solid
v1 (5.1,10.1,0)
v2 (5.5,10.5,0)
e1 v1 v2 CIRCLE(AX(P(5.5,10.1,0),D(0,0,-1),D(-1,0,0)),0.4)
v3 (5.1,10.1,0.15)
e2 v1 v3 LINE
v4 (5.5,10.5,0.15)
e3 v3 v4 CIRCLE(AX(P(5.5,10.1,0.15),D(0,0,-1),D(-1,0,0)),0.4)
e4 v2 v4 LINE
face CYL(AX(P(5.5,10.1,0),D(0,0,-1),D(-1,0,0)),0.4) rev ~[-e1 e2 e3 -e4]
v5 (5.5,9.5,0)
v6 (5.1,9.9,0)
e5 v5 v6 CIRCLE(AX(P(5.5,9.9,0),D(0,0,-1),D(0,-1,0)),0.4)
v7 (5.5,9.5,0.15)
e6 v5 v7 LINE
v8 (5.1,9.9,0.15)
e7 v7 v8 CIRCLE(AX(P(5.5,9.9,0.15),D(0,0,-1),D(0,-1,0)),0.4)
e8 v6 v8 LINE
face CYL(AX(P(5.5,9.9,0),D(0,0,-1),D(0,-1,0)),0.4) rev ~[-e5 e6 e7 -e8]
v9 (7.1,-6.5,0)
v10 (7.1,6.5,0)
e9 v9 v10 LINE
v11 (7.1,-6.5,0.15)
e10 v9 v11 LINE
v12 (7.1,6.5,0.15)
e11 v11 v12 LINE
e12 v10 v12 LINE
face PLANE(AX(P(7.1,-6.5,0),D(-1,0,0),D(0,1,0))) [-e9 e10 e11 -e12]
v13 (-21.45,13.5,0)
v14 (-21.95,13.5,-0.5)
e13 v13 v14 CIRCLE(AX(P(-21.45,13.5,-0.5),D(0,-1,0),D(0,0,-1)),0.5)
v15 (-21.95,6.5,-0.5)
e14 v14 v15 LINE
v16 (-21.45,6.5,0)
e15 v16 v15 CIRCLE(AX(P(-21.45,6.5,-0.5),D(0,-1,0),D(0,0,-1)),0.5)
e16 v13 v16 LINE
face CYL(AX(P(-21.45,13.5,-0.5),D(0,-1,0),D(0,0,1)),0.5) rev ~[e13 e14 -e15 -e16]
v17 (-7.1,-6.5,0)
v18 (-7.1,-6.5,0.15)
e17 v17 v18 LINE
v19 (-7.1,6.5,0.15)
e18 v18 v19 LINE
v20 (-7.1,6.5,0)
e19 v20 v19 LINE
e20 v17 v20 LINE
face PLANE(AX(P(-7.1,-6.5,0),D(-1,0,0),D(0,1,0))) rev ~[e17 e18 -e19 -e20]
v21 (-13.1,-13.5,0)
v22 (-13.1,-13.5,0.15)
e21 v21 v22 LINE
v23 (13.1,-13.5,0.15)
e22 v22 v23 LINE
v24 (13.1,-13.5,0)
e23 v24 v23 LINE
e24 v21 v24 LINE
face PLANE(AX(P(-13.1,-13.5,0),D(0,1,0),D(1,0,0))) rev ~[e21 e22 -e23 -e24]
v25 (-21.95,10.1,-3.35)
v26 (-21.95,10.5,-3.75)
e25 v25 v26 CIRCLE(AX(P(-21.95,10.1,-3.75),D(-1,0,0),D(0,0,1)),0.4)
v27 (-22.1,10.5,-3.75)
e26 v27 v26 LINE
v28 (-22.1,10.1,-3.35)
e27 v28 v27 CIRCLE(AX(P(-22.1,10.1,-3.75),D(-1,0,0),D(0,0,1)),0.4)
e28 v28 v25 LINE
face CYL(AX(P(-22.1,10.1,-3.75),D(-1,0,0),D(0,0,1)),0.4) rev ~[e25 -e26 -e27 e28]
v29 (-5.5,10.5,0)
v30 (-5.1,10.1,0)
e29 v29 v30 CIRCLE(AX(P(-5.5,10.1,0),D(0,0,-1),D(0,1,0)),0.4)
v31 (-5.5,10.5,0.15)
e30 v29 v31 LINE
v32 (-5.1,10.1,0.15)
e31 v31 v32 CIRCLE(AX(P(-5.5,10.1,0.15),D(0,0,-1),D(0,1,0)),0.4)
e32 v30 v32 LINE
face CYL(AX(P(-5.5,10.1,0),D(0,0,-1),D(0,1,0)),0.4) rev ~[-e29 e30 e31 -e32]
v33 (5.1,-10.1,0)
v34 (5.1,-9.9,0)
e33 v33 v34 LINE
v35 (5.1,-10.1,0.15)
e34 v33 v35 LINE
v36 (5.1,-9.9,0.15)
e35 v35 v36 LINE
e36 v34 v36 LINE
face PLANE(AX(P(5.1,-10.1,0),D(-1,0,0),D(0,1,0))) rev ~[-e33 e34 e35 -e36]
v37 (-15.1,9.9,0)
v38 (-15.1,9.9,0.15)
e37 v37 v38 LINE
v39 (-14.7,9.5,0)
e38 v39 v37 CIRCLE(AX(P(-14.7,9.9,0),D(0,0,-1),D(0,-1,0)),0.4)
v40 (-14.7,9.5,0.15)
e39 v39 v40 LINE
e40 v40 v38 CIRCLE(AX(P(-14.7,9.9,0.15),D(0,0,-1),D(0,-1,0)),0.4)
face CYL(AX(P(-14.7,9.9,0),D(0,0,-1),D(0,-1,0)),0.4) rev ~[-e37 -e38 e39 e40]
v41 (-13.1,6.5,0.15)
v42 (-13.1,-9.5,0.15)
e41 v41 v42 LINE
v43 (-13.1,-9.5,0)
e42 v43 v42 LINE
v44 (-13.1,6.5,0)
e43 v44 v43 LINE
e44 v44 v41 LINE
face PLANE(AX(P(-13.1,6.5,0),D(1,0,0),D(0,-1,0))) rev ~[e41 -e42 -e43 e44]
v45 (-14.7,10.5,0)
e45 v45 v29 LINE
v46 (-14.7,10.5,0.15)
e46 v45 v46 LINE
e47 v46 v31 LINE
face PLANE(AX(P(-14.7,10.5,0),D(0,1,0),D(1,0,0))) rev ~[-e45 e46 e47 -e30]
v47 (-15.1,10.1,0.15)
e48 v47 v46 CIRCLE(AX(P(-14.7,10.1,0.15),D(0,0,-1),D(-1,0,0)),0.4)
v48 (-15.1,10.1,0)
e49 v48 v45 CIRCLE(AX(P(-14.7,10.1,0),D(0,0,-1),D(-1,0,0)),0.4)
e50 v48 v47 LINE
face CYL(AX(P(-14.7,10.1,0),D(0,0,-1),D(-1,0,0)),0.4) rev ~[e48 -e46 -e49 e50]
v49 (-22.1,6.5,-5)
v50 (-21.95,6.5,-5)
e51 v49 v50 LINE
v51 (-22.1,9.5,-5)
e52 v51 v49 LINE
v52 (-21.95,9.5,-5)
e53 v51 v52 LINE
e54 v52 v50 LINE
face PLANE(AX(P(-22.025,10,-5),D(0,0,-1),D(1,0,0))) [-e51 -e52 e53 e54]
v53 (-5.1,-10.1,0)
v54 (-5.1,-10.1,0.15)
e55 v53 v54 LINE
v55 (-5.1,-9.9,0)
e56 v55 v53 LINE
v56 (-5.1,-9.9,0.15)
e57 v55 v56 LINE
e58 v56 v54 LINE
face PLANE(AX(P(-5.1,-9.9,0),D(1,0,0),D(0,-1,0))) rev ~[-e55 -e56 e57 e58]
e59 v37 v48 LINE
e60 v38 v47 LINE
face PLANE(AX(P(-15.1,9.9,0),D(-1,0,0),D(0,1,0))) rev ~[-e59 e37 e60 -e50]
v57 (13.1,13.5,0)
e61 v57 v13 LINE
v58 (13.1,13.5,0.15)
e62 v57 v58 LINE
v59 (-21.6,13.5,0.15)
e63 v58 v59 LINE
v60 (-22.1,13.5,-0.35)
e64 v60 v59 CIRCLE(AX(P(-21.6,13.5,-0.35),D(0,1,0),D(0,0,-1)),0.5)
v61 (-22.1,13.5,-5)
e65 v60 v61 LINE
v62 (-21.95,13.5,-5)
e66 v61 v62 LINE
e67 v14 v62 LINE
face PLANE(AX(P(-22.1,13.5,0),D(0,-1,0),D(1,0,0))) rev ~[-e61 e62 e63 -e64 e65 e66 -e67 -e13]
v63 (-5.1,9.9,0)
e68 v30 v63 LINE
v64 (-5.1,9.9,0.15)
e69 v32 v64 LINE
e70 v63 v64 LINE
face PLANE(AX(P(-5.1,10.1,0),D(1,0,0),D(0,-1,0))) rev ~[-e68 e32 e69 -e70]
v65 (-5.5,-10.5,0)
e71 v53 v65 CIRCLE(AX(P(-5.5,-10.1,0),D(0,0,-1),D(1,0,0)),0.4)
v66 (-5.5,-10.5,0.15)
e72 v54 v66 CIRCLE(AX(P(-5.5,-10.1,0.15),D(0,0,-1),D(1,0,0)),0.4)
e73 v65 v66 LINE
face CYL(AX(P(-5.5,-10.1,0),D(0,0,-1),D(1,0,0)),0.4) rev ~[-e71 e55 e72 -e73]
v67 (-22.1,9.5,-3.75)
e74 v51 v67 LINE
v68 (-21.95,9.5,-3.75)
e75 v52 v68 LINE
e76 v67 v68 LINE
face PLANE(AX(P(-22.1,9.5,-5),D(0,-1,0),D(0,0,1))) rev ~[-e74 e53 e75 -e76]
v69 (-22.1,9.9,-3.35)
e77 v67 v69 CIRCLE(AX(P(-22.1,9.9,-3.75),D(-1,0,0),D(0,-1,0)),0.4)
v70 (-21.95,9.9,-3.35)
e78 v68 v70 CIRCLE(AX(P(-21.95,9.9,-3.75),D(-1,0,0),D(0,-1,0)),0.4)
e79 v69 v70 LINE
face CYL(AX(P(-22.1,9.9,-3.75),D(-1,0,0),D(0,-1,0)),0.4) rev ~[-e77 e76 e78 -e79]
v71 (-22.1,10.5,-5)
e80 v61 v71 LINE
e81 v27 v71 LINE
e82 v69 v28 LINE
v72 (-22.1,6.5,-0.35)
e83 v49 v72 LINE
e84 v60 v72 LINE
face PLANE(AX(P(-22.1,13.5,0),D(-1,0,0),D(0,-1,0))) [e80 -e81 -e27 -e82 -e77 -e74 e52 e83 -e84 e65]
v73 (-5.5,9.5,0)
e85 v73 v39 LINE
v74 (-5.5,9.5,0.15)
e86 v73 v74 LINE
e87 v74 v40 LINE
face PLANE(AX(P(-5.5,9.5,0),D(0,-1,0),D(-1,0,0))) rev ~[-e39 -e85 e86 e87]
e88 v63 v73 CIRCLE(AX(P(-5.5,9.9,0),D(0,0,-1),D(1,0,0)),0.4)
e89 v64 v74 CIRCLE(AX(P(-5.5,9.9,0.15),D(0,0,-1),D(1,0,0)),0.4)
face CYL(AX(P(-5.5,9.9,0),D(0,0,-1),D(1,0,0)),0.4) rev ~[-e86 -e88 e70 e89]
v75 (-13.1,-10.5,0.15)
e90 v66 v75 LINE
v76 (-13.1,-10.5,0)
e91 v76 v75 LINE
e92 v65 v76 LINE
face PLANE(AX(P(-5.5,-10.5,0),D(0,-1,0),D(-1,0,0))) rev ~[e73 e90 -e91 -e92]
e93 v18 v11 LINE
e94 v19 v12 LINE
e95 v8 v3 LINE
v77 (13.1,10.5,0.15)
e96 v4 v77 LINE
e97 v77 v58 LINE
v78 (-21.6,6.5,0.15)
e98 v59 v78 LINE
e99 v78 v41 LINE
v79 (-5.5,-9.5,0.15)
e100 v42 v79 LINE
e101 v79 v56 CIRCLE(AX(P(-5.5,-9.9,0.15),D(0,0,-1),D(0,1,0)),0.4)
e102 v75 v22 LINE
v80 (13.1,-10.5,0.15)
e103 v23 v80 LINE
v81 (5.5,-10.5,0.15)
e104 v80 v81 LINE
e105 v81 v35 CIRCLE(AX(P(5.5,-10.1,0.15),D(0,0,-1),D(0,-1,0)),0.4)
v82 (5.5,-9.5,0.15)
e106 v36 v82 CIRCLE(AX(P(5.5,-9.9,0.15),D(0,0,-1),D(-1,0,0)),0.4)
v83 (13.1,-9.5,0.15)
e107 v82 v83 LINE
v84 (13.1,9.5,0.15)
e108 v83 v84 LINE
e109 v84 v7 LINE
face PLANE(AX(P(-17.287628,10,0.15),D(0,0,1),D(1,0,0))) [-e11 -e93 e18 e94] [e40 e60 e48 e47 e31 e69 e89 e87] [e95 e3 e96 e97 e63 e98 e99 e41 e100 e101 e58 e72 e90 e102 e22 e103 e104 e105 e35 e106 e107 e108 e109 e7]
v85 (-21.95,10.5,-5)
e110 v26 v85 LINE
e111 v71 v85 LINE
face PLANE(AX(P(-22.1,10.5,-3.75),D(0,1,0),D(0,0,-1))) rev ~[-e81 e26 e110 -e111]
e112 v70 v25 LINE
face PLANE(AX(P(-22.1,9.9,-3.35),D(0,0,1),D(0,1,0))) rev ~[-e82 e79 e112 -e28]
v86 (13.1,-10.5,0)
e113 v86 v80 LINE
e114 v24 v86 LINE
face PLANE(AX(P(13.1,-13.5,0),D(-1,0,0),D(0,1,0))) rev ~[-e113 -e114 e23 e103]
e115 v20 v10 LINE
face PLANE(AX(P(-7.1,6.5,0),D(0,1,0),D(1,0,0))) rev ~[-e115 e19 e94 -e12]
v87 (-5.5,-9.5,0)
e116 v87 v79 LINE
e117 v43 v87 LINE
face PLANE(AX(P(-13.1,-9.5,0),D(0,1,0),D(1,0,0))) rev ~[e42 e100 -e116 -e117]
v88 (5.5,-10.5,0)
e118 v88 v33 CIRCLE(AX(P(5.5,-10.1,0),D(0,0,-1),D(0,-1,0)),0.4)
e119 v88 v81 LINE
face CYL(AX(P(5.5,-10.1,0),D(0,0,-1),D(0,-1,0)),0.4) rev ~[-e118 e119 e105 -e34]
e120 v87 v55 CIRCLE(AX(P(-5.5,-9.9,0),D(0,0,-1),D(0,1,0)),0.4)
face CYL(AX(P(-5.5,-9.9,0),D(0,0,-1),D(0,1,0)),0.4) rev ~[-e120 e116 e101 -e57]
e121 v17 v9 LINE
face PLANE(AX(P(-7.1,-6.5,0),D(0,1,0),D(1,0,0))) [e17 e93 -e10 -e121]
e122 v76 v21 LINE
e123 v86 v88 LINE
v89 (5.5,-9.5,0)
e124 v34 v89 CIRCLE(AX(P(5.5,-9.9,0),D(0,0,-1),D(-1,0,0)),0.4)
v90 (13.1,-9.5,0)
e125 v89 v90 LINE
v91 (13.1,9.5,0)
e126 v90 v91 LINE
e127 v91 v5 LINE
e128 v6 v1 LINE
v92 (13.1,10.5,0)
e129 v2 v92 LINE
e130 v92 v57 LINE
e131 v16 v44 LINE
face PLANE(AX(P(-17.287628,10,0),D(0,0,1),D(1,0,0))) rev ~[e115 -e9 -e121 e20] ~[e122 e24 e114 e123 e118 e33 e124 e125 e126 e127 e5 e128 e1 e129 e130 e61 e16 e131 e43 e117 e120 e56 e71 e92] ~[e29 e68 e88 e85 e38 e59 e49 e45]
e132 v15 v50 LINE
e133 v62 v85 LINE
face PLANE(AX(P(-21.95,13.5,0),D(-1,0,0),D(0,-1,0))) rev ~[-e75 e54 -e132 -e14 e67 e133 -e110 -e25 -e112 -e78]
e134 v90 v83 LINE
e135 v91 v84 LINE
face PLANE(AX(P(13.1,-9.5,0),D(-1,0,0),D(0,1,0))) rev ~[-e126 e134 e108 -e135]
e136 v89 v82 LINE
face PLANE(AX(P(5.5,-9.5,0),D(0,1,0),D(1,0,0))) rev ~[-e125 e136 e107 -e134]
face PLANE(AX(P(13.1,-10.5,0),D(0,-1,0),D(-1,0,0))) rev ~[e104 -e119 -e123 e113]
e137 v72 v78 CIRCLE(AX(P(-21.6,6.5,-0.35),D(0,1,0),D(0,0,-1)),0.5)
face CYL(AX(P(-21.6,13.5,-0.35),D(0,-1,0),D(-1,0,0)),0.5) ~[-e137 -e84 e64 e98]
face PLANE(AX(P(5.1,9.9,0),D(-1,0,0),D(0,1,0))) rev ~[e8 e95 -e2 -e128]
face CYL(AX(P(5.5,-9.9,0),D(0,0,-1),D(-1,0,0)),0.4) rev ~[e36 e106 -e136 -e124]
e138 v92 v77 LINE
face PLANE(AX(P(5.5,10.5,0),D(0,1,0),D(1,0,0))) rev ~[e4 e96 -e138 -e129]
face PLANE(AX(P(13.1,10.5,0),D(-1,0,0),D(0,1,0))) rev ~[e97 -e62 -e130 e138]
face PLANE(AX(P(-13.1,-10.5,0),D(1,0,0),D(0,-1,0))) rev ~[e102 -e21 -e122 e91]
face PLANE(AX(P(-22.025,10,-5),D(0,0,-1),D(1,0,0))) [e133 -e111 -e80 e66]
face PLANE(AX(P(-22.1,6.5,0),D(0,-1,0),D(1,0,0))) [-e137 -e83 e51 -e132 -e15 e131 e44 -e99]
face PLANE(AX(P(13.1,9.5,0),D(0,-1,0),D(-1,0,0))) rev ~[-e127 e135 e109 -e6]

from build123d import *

# Parameters (mm, degrees)
F0_W     = 14.2
F0_H     = 13
F1_DEPTH = 0.15
F2_W     = 0.15
F2_H     = 7
F3_DEPTH = 5
F4_R     = 0.5
F6_DEPTH = 25


# Not quite as in the source:
# - a feature names something its author has since deleted; it is built from what else it names


with BuildPart() as f1:
    # F0 (on Top) → F1 (new body)
    with BuildSketch(Plane.XY):
        with BuildLine():
            Line((-13.1, 10.5), (-13.1, 13.5))
            Line((-13.1, 13.5), (-22.1, 13.5))
            Line((-22.1, 13.5), (-22.1, 6.5))
            Line((-22.1, 6.5), (-13.1, 6.5))
            Line((-13.1, 6.5), (-13.1, 9.5))
            Line((-13.1, 9.5), (-14.7, 9.5))
            ThreePointArc((-14.7, 9.5), (-14.9828427125, 9.6171572875), (-15.1, 9.9))
            Line((-15.1, 9.9), (-15.1, 10.1))
            ThreePointArc((-15.1, 10.1), (-14.9828427125, 10.3828427125), (-14.7, 10.5))
            Line((-14.7, 10.5), (-13.1, 10.5))
        make_face()
        with BuildLine():
            Line((13.1, 10.5), (13.1, 13.5))
            Line((13.1, 13.5), (-7.1, 13.5))
            Line((-7.1, 13.5), (-13.1, 13.5))
            Line((-13.1, 13.5), (-13.1, 10.5))
            Line((-13.1, 10.5), (-5.5, 10.5))
            ThreePointArc((-5.5, 10.5), (-5.2171572875, 10.3828427125), (-5.1, 10.1))
            Line((-5.1, 10.1), (-5.1, 9.9))
            ThreePointArc((-5.1, 9.9), (-5.2171572875, 9.6171572875), (-5.5, 9.5))
            Line((-5.5, 9.5), (-13.1, 9.5))
            Line((-13.1, 9.5), (-13.1, 6.5))
            Line((-13.1, 6.5), (-13.1, 0))
            Line((-13.1, 0), (-13.1, -6.5))
            Line((-13.1, -6.5), (-13.1, -9.5))
            Line((-13.1, -9.5), (-5.5, -9.5))
            ThreePointArc((-5.5, -9.5), (-5.2171572875, -9.6171572875), (-5.1, -9.9))
            Line((-5.1, -9.9), (-5.1, -10.1))
            ThreePointArc((-5.1, -10.1), (-5.2171572875, -10.3828427125), (-5.5, -10.5))
            Line((-5.5, -10.5), (-13.1, -10.5))
            Line((-13.1, -10.5), (-13.1, -13.5))
            Line((-13.1, -13.5), (-7.1, -13.5))
            Line((-7.1, -13.5), (13.1, -13.5))
            Line((13.1, -13.5), (13.1, -10.5))
            Line((13.1, -10.5), (5.5, -10.5))
            ThreePointArc((5.5, -10.5), (5.2171572875, -10.3828427125), (5.1, -10.1))
            Line((5.1, -10.1), (5.1, -9.9))
            ThreePointArc((5.1, -9.9), (5.2171572875, -9.6171572875), (5.5, -9.5))
            Line((5.5, -9.5), (13.1, -9.5))
            Line((13.1, -9.5), (13.1, 0))
            Line((13.1, 0), (13.1, 9.5))
            Line((13.1, 9.5), (5.5, 9.5))
            ThreePointArc((5.5, 9.5), (5.2171572875, 9.6171572875), (5.1, 9.9))
            Line((5.1, 9.9), (5.1, 10.1))
            ThreePointArc((5.1, 10.1), (5.2171572875, 10.3828427125), (5.5, 10.5))
            Line((5.5, 10.5), (13.1, 10.5))
        make_face()
        Rectangle(F0_W, F0_H, mode=Mode.SUBTRACT)
    extrude(amount=F1_DEPTH)

    # F2 (on face) → F3 (join)
    with BuildSketch(Plane(origin=(0, 0, 0), x_dir=(1, 0, 0), z_dir=(0, 0, -1))):
        with Locations((-22.025, -10)):
            Rectangle(F2_W, F2_H)
    extrude(amount=F3_DEPTH)

    # F4
    f4_edges = [f1.edges().sort_by_distance(p)[0] for p in [
        (-21.95, 10, 0),
        (-22.1, 10, 0.15),
    ]]
    fillet(f4_edges, radius=F4_R)

    # F5 (on face) → F6 (cut)
    with BuildSketch(Plane(origin=(-22.1, 0, 0), x_dir=(0, -1, 0), z_dir=(-1, 0, 0))):
        with BuildLine():
            Line((-9.9, -3.35), (-10, -3.35))
            Line((-10, -3.35), (-10.1, -3.35))
            ThreePointArc((-10.1, -3.35), (-10.3828427125, -3.4671572875), (-10.5, -3.75))
            Line((-10.5, -3.75), (-10.5, -5))
            Line((-10.5, -5), (-9.5, -5))
            Line((-9.5, -5), (-9.5, -3.75))
            ThreePointArc((-9.5, -3.75), (-9.6171572875, -3.4671572875), (-9.9, -3.35))
        make_face()
    extrude(amount=-F6_DEPTH, mode=Mode.SUBTRACT)


solid = f1.part
